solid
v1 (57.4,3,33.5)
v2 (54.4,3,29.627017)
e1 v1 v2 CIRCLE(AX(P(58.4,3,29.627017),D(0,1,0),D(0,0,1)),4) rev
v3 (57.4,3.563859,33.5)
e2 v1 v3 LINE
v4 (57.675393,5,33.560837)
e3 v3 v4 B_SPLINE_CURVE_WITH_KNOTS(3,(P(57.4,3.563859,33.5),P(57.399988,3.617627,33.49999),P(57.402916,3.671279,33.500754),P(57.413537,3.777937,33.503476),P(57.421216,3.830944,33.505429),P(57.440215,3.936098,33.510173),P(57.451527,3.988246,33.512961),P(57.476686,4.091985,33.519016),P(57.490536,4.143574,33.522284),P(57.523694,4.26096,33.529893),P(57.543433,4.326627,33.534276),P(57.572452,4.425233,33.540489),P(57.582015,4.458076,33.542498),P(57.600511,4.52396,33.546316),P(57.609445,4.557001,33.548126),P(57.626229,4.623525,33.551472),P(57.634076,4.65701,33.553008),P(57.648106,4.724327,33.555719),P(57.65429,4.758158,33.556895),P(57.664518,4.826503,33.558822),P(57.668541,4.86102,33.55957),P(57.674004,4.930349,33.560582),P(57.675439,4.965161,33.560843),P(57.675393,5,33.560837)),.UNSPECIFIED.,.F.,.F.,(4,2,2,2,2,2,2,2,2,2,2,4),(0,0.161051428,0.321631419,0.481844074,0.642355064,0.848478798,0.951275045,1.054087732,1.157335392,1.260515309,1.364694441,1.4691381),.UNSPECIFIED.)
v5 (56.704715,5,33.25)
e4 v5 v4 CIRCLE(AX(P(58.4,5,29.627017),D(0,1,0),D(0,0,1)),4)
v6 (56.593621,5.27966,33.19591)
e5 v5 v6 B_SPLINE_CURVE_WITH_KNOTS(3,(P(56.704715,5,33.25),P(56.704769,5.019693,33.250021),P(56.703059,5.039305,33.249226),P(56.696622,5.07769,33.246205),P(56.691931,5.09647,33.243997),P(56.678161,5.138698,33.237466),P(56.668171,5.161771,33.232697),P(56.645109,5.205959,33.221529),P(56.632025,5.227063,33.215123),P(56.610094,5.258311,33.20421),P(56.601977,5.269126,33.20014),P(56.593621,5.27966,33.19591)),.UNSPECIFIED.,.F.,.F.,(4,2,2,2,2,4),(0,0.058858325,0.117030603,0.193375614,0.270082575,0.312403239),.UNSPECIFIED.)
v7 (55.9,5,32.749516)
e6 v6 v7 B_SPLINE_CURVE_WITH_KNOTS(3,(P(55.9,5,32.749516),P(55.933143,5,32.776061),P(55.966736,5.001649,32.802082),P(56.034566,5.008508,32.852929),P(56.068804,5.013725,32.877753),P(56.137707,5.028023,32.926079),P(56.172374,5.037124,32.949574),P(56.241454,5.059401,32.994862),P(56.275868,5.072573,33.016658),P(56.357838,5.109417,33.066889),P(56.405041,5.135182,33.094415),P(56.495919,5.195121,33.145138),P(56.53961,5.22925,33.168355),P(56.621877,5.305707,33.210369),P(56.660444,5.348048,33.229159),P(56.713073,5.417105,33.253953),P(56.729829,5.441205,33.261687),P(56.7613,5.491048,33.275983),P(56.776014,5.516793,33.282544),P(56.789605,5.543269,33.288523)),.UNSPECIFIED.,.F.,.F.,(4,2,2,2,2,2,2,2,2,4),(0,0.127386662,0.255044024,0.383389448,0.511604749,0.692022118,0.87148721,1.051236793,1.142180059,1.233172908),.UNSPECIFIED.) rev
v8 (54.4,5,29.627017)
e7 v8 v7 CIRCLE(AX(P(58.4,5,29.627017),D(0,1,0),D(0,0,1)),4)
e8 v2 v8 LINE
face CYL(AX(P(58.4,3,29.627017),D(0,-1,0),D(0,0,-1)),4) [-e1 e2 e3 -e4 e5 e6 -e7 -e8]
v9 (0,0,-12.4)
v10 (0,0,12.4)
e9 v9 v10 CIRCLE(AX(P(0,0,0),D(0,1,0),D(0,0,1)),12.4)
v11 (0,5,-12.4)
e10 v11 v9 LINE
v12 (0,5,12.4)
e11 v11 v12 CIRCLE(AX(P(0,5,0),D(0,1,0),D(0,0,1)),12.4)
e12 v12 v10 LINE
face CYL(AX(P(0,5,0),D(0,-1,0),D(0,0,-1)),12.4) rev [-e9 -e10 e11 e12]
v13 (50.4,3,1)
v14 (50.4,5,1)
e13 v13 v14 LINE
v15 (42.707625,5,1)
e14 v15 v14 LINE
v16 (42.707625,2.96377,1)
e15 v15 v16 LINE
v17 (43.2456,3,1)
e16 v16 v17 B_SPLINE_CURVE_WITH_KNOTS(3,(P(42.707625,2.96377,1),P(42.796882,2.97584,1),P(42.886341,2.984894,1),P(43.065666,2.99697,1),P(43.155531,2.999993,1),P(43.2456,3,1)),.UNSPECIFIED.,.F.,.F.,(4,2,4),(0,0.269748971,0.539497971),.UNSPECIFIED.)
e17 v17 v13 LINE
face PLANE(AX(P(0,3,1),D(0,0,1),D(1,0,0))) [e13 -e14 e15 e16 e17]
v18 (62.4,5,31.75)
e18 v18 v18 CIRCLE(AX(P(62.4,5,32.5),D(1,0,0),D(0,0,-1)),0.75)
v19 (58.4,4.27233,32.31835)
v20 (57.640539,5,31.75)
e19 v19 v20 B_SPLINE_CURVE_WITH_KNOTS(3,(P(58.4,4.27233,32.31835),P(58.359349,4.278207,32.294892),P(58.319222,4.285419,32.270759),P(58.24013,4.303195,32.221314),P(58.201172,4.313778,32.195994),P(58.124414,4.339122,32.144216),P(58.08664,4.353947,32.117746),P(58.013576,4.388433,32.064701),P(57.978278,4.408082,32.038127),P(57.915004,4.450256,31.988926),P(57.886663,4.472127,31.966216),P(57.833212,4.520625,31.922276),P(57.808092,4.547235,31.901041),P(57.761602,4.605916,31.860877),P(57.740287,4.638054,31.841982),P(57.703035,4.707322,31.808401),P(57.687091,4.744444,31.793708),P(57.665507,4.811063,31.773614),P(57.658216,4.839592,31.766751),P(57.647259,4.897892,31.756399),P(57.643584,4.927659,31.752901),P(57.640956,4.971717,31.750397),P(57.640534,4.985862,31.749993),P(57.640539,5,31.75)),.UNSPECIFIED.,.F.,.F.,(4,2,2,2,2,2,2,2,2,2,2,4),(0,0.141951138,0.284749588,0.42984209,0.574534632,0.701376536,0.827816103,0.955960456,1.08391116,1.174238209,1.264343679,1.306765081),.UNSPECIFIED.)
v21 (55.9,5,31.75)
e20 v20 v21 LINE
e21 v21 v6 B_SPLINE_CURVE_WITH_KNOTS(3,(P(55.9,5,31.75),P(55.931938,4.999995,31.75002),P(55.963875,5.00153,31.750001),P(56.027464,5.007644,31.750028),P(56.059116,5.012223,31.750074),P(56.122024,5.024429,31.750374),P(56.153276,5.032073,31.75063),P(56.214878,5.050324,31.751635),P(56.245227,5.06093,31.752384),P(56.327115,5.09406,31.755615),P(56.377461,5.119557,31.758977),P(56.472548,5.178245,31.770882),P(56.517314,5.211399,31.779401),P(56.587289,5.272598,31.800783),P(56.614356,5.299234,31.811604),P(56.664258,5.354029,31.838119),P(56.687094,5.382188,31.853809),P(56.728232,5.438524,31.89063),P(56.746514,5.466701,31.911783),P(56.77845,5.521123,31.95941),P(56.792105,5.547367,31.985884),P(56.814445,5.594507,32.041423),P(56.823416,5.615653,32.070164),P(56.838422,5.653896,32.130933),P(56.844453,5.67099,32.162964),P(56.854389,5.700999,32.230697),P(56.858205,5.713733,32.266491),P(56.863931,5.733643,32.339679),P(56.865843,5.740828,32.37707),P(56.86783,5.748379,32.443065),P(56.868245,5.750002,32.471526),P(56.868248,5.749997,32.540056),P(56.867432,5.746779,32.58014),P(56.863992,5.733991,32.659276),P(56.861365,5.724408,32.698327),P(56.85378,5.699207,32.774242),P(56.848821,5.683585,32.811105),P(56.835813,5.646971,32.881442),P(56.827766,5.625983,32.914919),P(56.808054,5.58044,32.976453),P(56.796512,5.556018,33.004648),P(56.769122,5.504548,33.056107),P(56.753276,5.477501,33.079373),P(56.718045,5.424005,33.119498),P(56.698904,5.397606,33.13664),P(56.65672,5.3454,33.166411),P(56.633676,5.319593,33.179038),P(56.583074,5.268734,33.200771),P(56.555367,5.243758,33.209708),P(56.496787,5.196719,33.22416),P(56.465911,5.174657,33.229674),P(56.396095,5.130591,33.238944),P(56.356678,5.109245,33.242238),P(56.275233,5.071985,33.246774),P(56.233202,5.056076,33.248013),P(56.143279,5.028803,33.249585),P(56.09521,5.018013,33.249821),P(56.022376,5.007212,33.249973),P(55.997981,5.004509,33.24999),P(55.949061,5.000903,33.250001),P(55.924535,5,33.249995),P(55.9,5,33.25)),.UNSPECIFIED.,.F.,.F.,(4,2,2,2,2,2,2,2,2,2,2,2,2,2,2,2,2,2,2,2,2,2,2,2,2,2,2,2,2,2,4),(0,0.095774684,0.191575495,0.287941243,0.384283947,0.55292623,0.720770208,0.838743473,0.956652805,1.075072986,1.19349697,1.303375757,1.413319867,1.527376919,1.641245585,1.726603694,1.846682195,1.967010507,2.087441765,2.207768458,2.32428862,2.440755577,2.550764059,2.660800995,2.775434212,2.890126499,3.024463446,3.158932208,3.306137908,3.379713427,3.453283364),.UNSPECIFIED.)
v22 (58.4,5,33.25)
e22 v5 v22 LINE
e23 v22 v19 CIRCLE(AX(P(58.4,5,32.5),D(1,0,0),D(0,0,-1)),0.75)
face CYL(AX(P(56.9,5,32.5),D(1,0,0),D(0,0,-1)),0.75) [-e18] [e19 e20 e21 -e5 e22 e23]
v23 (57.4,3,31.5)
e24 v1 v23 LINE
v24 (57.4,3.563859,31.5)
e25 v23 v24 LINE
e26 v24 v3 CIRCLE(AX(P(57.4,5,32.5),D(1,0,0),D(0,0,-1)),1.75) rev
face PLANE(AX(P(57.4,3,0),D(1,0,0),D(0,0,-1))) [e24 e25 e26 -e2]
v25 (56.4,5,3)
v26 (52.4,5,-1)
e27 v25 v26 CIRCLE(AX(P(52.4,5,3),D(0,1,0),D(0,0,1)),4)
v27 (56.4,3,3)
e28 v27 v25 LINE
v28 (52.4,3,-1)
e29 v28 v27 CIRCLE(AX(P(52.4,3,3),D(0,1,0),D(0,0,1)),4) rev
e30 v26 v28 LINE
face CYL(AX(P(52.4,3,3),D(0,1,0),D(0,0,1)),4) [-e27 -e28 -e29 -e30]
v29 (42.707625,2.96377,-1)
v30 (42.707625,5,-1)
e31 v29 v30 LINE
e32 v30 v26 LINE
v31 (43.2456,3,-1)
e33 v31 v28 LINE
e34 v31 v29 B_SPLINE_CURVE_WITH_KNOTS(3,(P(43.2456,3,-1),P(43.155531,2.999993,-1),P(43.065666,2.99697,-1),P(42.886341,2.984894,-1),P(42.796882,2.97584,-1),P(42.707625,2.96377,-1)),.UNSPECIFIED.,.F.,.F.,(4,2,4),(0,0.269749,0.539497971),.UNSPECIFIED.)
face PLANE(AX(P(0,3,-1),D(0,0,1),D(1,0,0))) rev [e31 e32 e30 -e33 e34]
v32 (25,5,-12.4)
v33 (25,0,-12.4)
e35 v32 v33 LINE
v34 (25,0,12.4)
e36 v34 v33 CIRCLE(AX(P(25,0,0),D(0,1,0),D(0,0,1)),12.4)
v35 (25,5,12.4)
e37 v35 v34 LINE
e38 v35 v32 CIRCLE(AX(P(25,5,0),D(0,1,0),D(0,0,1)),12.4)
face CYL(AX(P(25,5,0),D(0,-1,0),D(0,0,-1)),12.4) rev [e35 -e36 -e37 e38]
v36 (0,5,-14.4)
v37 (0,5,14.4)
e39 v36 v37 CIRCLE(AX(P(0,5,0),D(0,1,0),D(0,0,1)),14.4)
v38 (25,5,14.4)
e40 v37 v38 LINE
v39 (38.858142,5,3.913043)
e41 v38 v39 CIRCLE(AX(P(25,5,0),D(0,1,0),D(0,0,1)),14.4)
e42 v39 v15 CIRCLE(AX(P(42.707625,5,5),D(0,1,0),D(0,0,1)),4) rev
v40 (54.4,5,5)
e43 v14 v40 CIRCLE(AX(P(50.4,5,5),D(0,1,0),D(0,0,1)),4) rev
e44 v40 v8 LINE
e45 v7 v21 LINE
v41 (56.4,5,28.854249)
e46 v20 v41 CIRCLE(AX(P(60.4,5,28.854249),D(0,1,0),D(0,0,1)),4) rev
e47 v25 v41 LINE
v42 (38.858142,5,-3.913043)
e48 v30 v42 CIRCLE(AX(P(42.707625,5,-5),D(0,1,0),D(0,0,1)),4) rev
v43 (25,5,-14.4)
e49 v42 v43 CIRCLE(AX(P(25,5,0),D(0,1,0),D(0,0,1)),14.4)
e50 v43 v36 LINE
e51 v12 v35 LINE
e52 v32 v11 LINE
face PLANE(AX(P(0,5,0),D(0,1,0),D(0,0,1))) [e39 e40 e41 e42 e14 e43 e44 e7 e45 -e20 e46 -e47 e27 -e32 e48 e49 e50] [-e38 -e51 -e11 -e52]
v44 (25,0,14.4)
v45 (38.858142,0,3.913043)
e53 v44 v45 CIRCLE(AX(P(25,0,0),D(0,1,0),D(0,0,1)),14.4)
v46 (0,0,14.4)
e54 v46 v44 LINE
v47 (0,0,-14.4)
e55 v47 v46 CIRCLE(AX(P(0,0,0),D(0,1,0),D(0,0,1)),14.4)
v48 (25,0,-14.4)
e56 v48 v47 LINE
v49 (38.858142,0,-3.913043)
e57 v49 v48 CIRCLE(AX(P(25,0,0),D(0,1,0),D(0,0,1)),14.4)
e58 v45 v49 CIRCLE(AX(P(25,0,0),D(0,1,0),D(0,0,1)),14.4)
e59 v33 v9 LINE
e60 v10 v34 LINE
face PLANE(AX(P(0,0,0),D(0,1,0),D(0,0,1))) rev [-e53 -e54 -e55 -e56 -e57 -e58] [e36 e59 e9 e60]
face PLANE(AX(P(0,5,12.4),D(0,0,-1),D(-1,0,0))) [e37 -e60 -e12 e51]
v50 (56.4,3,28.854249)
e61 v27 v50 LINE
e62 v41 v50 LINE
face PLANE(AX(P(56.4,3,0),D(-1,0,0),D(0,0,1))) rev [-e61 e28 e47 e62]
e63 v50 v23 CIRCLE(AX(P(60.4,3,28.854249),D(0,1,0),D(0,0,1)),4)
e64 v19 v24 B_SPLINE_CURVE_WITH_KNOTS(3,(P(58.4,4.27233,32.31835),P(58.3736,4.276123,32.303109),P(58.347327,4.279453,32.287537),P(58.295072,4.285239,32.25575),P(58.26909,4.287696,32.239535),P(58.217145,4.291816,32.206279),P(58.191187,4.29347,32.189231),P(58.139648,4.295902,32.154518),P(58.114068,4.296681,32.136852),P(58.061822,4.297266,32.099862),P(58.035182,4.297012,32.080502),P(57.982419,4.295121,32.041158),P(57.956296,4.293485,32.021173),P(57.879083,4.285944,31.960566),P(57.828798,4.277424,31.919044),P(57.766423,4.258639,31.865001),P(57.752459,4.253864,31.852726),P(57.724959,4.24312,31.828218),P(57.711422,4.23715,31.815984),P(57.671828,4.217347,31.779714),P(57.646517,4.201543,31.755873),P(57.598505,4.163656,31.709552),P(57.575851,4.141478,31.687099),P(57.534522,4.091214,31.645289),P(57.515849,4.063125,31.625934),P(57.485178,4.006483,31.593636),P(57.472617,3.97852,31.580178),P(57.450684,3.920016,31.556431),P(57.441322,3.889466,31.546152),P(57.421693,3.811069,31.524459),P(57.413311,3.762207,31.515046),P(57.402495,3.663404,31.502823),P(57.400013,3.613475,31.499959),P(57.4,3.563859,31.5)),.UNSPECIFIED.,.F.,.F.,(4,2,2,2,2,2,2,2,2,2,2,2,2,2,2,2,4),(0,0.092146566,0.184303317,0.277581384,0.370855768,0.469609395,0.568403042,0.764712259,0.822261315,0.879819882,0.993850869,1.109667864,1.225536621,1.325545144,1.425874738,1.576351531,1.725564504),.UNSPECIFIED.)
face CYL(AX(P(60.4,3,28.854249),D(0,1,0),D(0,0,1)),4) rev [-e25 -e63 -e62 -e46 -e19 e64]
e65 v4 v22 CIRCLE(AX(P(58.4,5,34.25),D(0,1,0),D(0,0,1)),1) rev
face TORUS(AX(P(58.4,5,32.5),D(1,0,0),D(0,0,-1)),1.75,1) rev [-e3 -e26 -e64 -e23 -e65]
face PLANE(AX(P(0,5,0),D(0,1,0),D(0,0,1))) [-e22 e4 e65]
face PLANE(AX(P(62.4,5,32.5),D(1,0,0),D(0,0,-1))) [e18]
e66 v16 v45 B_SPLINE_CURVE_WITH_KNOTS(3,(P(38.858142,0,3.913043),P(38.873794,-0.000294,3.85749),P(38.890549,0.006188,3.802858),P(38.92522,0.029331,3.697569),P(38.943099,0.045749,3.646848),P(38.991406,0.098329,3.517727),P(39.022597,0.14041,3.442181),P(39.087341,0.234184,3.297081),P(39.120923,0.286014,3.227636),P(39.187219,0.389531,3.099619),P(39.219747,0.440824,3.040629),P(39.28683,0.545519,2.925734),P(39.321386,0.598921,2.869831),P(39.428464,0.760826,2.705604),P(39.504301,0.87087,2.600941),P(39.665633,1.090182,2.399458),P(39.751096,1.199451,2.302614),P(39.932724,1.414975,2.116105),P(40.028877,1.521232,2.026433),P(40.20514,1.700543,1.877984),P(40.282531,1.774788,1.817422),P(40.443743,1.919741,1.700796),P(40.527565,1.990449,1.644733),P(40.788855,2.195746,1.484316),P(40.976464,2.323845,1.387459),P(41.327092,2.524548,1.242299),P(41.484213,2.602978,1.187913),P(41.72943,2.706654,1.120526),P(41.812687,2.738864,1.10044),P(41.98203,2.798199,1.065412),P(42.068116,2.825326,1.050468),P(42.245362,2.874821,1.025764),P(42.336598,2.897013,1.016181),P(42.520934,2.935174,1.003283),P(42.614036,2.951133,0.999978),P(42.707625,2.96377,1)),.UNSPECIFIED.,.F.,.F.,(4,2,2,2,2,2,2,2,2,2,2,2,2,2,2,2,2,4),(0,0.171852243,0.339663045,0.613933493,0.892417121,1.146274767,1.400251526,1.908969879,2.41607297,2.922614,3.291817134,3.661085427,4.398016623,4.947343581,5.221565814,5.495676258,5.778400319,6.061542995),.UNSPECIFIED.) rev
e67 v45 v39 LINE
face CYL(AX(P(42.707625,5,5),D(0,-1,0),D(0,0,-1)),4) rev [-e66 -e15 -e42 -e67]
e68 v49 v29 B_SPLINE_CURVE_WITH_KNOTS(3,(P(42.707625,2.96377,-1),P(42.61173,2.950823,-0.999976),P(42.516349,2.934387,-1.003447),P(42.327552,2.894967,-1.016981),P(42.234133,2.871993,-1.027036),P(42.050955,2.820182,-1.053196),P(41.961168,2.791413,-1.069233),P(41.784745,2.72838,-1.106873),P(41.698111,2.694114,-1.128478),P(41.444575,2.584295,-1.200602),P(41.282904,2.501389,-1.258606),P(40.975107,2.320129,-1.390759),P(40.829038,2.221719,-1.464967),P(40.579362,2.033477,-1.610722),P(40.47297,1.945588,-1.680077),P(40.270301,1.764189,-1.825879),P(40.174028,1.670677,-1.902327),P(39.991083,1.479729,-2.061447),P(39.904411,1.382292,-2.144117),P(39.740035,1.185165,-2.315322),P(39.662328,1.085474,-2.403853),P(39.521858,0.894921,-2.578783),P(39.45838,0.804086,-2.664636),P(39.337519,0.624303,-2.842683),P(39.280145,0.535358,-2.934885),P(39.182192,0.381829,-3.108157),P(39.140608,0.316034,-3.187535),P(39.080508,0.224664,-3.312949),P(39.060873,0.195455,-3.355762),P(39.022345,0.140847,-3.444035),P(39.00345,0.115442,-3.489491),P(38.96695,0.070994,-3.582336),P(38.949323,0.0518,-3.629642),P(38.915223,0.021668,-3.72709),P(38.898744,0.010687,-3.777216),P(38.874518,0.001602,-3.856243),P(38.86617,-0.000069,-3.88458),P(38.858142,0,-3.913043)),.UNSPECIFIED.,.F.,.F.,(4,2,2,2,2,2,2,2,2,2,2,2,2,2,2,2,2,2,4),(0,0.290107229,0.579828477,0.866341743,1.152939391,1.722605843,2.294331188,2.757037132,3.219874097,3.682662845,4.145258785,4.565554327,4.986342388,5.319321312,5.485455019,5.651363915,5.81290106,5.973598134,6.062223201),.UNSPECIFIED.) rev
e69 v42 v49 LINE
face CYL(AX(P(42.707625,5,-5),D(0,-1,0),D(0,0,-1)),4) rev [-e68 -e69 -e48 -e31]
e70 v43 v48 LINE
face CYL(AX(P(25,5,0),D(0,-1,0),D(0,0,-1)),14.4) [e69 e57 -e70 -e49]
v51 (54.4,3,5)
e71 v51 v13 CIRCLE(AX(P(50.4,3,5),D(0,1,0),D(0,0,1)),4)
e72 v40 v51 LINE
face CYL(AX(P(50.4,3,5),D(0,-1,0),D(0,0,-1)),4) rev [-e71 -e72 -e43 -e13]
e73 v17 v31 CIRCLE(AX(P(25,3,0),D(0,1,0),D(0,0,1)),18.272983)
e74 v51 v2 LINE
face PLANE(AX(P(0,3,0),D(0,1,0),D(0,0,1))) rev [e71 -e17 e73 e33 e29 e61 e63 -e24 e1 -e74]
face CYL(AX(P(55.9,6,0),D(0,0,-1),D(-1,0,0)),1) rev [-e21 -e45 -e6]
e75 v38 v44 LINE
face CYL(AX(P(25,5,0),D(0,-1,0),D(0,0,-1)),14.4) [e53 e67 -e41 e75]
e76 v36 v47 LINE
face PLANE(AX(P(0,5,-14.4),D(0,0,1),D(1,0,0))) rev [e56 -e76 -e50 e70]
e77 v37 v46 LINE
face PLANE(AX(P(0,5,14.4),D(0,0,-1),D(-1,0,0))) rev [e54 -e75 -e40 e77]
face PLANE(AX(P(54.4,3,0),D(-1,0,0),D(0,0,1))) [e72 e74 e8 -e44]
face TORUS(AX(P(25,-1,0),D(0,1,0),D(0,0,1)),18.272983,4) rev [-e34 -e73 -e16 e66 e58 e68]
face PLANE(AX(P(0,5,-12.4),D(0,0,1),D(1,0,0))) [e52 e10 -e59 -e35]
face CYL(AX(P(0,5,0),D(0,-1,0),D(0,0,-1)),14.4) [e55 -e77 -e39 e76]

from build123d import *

# Parameters (mm, degrees)
BOSS_EXTRUDE1_DEPTH      = 5
BOSS_EXTRUDE2_START      = 2
SKETCH2_W                = 2
SKETCH2_H                = 2
SKETCH2_H_2              = 30.5
SKETCH2_W_2              = 1
BOSS_EXTRUDE2_DEPTH      = 2
FILLET1_R                = 4
BOSS_EXTRUDE3_DEPTH      = 5
BOSS_EXTRUDE3_DEPTH_BACK = 0.5
SKETCH3_R                = 0.75
FILLET2_R                = 1


with BuildPart() as part:
    # Sketch1 → Boss-Extrude1 (new body)
    with BuildSketch(Plane(origin=(0, 0, 0), x_dir=(1, 0, 0), z_dir=(0, 1, 0))):
        with BuildLine():
            Line((0, 14.4), (25, 14.4))
            ThreePointArc((25, 14.4), (39.4, 0), (25, -14.4))
            Line((25, -14.4), (0, -14.4))
            ThreePointArc((0, -14.4), (-14.4, 0), (0, 14.4))
        make_face()
        with BuildLine():
            Line((0, 12.4), (25, 12.4))
            ThreePointArc((25, 12.4), (37.4, 0), (25, -12.4))
            Line((25, -12.4), (0, -12.4))
            ThreePointArc((0, -12.4), (-12.4, 0), (0, 12.4))
        make_face(mode=Mode.SUBTRACT)
    extrude(amount=BOSS_EXTRUDE1_DEPTH)

    # Sketch2 → Boss-Extrude2 (add)
    with BuildSketch(Plane.XZ.offset(-5).offset(BOSS_EXTRUDE2_START)):
        with BuildLine():
            Line((39.365235814, -1), (54.4, -1))
            Line((54.4, -1), (54.4, 1))
            Line((54.4, 1), (39.365235814, 1))
            ThreePointArc((39.365235814, 1), (39.4, 0), (39.365235814, -1))
        make_face()
        with BuildLine():
            Line((37.4, -1), (39.365235814, -1))
            ThreePointArc((39.365235814, -1), (39.4, 0), (39.365235814, 1))
            Line((39.365235814, 1), (37.4, 1))
            Line((37.4, 1), (37.4, -1))
        make_face()
        with Locations((55.4, 0)):
            Rectangle(SKETCH2_W, SKETCH2_H)
        with Locations((55.4, 16.25)):
            Rectangle(SKETCH2_W, SKETCH2_H_2)
        with Locations((55.4, 32.5)):
            Rectangle(SKETCH2_W, SKETCH2_H)
        with Locations((56.9, 32.5)):
            Rectangle(SKETCH2_W_2, SKETCH2_H)
    extrude(amount=-BOSS_EXTRUDE2_DEPTH)

    # Fillet1
    # the kernel refuses this fillet: 4 mm, written as the material it adds along each edge
    with BuildSketch(Plane(origin=(25, 3, 0), x_dir=(0.7371891614816782, 0, -0.6756864214959037), z_dir=(-0.6756864214959037, 0, -0.7371891614816782))) as fillet1_piece_1_section:
        with BuildLine():
            CenterArc((18.272983346, 4), FILLET1_R, 194.477512186, 75.522487814)
            Line((18.272983346, 0), (18.272983346, -0.08))
            Line((18.272983346, -0.08), (14.4, -0.08))
            Line((14.4, -0.08), (14.32, 0))
            ThreePointArc((14.32, 0), (14.32, 1.5), (14.322540333, 2.98))
            Line((14.322540333, 2.98), (14.4, 3))
        make_face()
    fillet1_piece_1 = revolve(axis=Axis((25, 3, 0), (0, -1, 0)), revolution_arc=85.014954966, mode=Mode.PRIVATE)
    fillet1_piece_1 = split(fillet1_piece_1, bisect_by=Plane(origin=(40.301586348, 2.241602013, 1), z_dir=(0, 0, -1)), keep=Keep.TOP, mode=Mode.PRIVATE)
    fillet1_piece_1 = split(fillet1_piece_1, bisect_by=Plane(origin=(40.301586348, 2.241602013, -1), z_dir=(0, 0, 1)), keep=Keep.TOP, mode=Mode.PRIVATE)
    add(fillet1_piece_1)
    with BuildSketch(Plane(origin=(39.365235814, 5, 1), x_dir=(-0.17149804582148107, 0, 0.9851844600273663), z_dir=(0, -1, 0))) as fillet1_piece_2:
        with BuildLine():
            CenterArc((3.367524545, -3.978862537), FILLET1_R, 95.892851455, 74.232218513)
            Line((-0.573213295, -3.292870354), (-0.652028052, -3.27915051))
            Line((-0.652028052, -3.27915051), (-0.078814757, 0.013719844))
            Line((-0.078814757, 0.013719844), (0.008213474, 0.079577251))
            ThreePointArc((0.008213474, 0.079577251), (1.47842541, 0.003905135), (2.948637345, 0.079577251))
            Line((2.948637345, 0.079577251), (2.95685082, 0))
        make_face()
    extrude(amount=2)
    with BuildSketch(Plane(origin=(39.365235814, 5, -1), x_dir=(-0.17149804582148342, 0, -0.9851844600273658), z_dir=(0, -1, 0))) as fillet1_piece_3:
        with BuildLine():
            CenterArc((3.367524545, 3.978862537), FILLET1_R, 189.874930032, 74.232218513)
            Line((-0.573213295, 3.292870354), (-0.652028052, 3.27915051))
            Line((-0.652028052, 3.27915051), (-0.078814757, -0.013719844))
            Line((-0.078814757, -0.013719844), (0.008213474, -0.079577251))
            ThreePointArc((0.008213474, -0.079577251), (1.47842541, -0.003905135), (2.948637345, -0.079577251))
            Line((2.948637345, -0.079577251), (2.95685082, 0))
        make_face()
    extrude(amount=2)
    with BuildSketch(Plane(origin=(54.4, 3, 1), x_dir=(-1, 0, 0), z_dir=(0, 1, 0))) as fillet1_piece_4:
        with BuildLine():
            CenterArc((FILLET1_R, FILLET1_R), FILLET1_R, 180, 90)
            Line((0, FILLET1_R), (-FILLET1_R * 0.02, FILLET1_R))
            Line((-FILLET1_R * 0.02, FILLET1_R), (-FILLET1_R * 0.02, -FILLET1_R * 0.02))
            Line((-FILLET1_R * 0.02, -FILLET1_R * 0.02), (FILLET1_R, -FILLET1_R * 0.02))
            Line((FILLET1_R, -FILLET1_R * 0.02), (FILLET1_R, 0))
        make_face()
    extrude(amount=2)
    with BuildSketch(Plane(origin=(56.4, 3, 31.5), x_dir=(1, 0, 0), z_dir=(0, 1, 0))) as fillet1_piece_5:
        with BuildLine():
            CenterArc((4, 2.645751311), FILLET1_R, 180, 41.409622109)
            Line((0, 2.645751311), (-0.08, 2.645751311))
            Line((-0.08, 2.645751311), (-0.08, 0))
            Line((-0.08, 0), (0, -0.08))
            ThreePointArc((0, -0.08), (0.5, -0.08), (0.94, -0.052915026))
            Line((0.94, -0.052915026), (1, 0))
        make_face()
    extrude(amount=2)
    with BuildSketch(Plane(origin=(25, 3, 0), x_dir=(0.7371891614816782, 0, -0.6756864214959037), z_dir=(-0.6756864214959037, 0, -0.7371891614816782))) as fillet1_piece_6a_section:
        with BuildLine():
            CenterArc((18.272983346, 4), FILLET1_R, 194.477512186, 75.522487814)
            Line((18.272983346, 0), (18.272983346, -0.08))
            Line((18.272983346, -0.08), (14.4, -0.08))
            Line((14.4, -0.08), (14.32, 0))
            ThreePointArc((14.32, 0), (14.32, 1.5), (14.322540333, 2.98))
            Line((14.322540333, 2.98), (14.4, 3))
        make_face()
    fillet1_piece_6a = revolve(axis=Axis((25, 3, 0), (0, -1, 0)), revolution_arc=85.014954966, mode=Mode.PRIVATE)
    fillet1_piece_6a = split(fillet1_piece_6a, bisect_by=Plane(origin=(38.861424428, 2.266551756, -1), z_dir=(0, 0, -1)), keep=Keep.TOP, mode=Mode.PRIVATE)
    with BuildSketch(Plane(origin=(39.365235814, 5, -1), x_dir=(-0.17149804582148342, 0, -0.9851844600273658), z_dir=(0, -1, 0))) as fillet1_piece_6b_section:
        with BuildLine():
            CenterArc((3.367524545, 3.978862537), FILLET1_R, 189.874930032, 74.232218513)
            Line((-0.573213295, 3.292870354), (-0.652028052, 3.27915051))
            Line((-0.652028052, 3.27915051), (-0.078814757, -0.013719844))
            Line((-0.078814757, -0.013719844), (0.008213474, -0.079577251))
            ThreePointArc((0.008213474, -0.079577251), (1.47842541, -0.003905135), (2.948637345, -0.079577251))
            Line((2.948637345, -0.079577251), (2.95685082, 0))
        make_face()
    fillet1_piece_6b = extrude(amount=10.355974154, mode=Mode.PRIVATE)
    fillet1_piece_6b = split(fillet1_piece_6b, bisect_by=Plane(origin=(40.057221624, 0, -1.646357347), z_dir=(0, 1, 0)), keep=Keep.TOP, mode=Mode.PRIVATE)
    fillet1_piece_6b = split(fillet1_piece_6b, bisect_by=Plane(origin=(40.057221624, 3, -1.646357347), z_dir=(0, -1, 0)), keep=Keep.TOP, mode=Mode.PRIVATE)
    fillet1_piece_6 = fillet1_piece_6a & fillet1_piece_6b
    add(fillet1_piece_6)
    with BuildSketch(Plane(origin=(39.365235814, 5, 1), x_dir=(-0.17149804582148107, 0, 0.9851844600273663), z_dir=(0, -1, 0))) as fillet1_piece_7a_section:
        with BuildLine():
            CenterArc((3.367524545, -3.978862537), FILLET1_R, 95.892851455, 74.232218513)
            Line((-0.573213295, -3.292870354), (-0.652028052, -3.27915051))
            Line((-0.652028052, -3.27915051), (-0.078814757, 0.013719844))
            Line((-0.078814757, 0.013719844), (0.008213474, 0.079577251))
            ThreePointArc((0.008213474, 0.079577251), (1.47842541, 0.003905135), (2.948637345, 0.079577251))
            Line((2.948637345, 0.079577251), (2.95685082, 0))
        make_face()
    fillet1_piece_7a = extrude(amount=10.355974154, mode=Mode.PRIVATE)
    fillet1_piece_7a = split(fillet1_piece_7a, bisect_by=Plane(origin=(40.057221624, 0, 1.646357347), z_dir=(0, 1, 0)), keep=Keep.TOP, mode=Mode.PRIVATE)
    fillet1_piece_7a = split(fillet1_piece_7a, bisect_by=Plane(origin=(40.057221624, 3, 1.646357347), z_dir=(0, -1, 0)), keep=Keep.TOP, mode=Mode.PRIVATE)
    with BuildSketch(Plane(origin=(25, 3, 0), x_dir=(0.7371891614816782, 0, -0.6756864214959037), z_dir=(-0.6756864214959037, 0, -0.7371891614816782))) as fillet1_piece_7b_section:
        with BuildLine():
            CenterArc((18.272983346, 4), FILLET1_R, 194.477512186, 75.522487814)
            Line((18.272983346, 0), (18.272983346, -0.08))
            Line((18.272983346, -0.08), (14.4, -0.08))
            Line((14.4, -0.08), (14.32, 0))
            ThreePointArc((14.32, 0), (14.32, 1.5), (14.322540333, 2.98))
            Line((14.322540333, 2.98), (14.4, 3))
        make_face()
    fillet1_piece_7b = revolve(axis=Axis((25, 3, 0), (0, -1, 0)), revolution_arc=85.014954966, mode=Mode.PRIVATE)
    fillet1_piece_7b = split(fillet1_piece_7b, bisect_by=Plane(origin=(38.861423807, 2.266551545, 1), z_dir=(0, 0, 1)), keep=Keep.TOP, mode=Mode.PRIVATE)
    fillet1_piece_7 = fillet1_piece_7a & fillet1_piece_7b
    add(fillet1_piece_7)
    # the kernel refuses this fillet: 4 mm, written as the material it takes off along each edge
    with BuildSketch(Plane(origin=(56.4, -7, -1), x_dir=(0, 0, 1), z_dir=(0, 1, 0))) as fillet1_2_piece_1:
        with BuildLine():
            CenterArc((FILLET1_R, -FILLET1_R), FILLET1_R, 90, 90)
            Line((0, -FILLET1_R), (-FILLET1_R * 0.02, -FILLET1_R))
            Line((-FILLET1_R * 0.02, -FILLET1_R), (-FILLET1_R * 0.02, FILLET1_R * 0.02))
            Line((-FILLET1_R * 0.02, FILLET1_R * 0.02), (FILLET1_R, FILLET1_R * 0.02))
            Line((FILLET1_R, FILLET1_R * 0.02), (FILLET1_R, 0))
        make_face()
    extrude(amount=22, mode=Mode.SUBTRACT)
    with BuildSketch(Plane(origin=(54.4, -6.682458366, 33.5), x_dir=(0, 0, -1), z_dir=(0, 1, 0))) as fillet1_2_piece_2:
        with BuildLine():
            CenterArc((3.872983346, -4), FILLET1_R, 90, 75.522487814)
            Line((0, -3), (-0.077459667, -2.98))
            ThreePointArc((-0.077459667, -2.98), (-0.08, -1.5), (-0.08, 0))
            Line((-0.08, 0), (0, 0.08))
            Line((0, 0.08), (3.872983346, 0.08))
            Line((3.872983346, 0.08), (3.872983346, 0))
        make_face()
    extrude(amount=21.364916731, mode=Mode.SUBTRACT)

    # Sketch3 → Boss-Extrude3 (add, two sides: drawn at the far end of the back side and taken through both)
    with BuildSketch(Plane(origin=(57.4, 0, 0), x_dir=(0, 0, -1), z_dir=(1, 0, 0)).offset(-BOSS_EXTRUDE3_DEPTH_BACK)):
        with Locations((-32.5, 5)):
            Circle(SKETCH3_R)
    extrude(amount=BOSS_EXTRUDE3_DEPTH + BOSS_EXTRUDE3_DEPTH_BACK)

    # Fillet2
    # the kernel refuses this fillet: 1 mm, written as the material it adds along each edge
    with BuildSketch(Plane(origin=(56.9, 5, 29.25), x_dir=(-1, 0, 0), z_dir=(0, 0, 1))) as fillet2_piece_1_section:
        with BuildLine():
            CenterArc((FILLET2_R, -FILLET2_R), FILLET2_R, 90, 90)
            Line((0, -FILLET2_R), (0, 0))
            Line((0, 0), (FILLET2_R, 0))
        make_face()
    fillet2_piece_1 = extrude(amount=6.5, mode=Mode.PRIVATE)
    fillet2_piece_1 = fillet2_piece_1 & Plane(origin=(58.4, 5.187261993, 29.627016654), x_dir=(0, 0, -1), z_dir=(0, -1, 0)) * Cylinder(4, 17, mode=Mode.PRIVATE)
    fillet2_piece_1 = fillet2_piece_1 & Plane(origin=(56.665651888, 5, 32.5), x_dir=(0, 0, -1), z_dir=(1, 0, 0)) * Cylinder(0.75, 17, mode=Mode.PRIVATE)
    add(fillet2_piece_1)
    with BuildSketch(Plane(origin=(57.4, 5, 32.5), x_dir=(0, 0, 1), z_dir=(0, 1, 0))) as fillet2_piece_2_section:
        with BuildLine():
            CenterArc((0.75 + FILLET2_R, FILLET2_R), FILLET2_R, 180, 90)
            Line((0.75, FILLET2_R), (0.75, 0))
            Line((0.75, 0), (0.75 + FILLET2_R, 0))
        make_face()
    fillet2_piece_2 = revolve(axis=Axis((57.4, 5, 32.5), (1, 0, 0)), revolution_arc=180, mode=Mode.PRIVATE)
    fillet2_piece_2 = fillet2_piece_2 & Plane(origin=(58.4, 4.254671914, 29.627016654), x_dir=(0, 0, -1), z_dir=(0, -1, 0)) * Cylinder(4, 7, mode=Mode.PRIVATE)
    fillet2_piece_2 = fillet2_piece_2 - Plane(origin=(60.4, 4.254671914, 28.854248689), x_dir=(1, 0, 0), z_dir=(0, -1, 0)) * Cylinder(4, 7, mode=Mode.PRIVATE)
    add(fillet2_piece_2)


solid = part.part
